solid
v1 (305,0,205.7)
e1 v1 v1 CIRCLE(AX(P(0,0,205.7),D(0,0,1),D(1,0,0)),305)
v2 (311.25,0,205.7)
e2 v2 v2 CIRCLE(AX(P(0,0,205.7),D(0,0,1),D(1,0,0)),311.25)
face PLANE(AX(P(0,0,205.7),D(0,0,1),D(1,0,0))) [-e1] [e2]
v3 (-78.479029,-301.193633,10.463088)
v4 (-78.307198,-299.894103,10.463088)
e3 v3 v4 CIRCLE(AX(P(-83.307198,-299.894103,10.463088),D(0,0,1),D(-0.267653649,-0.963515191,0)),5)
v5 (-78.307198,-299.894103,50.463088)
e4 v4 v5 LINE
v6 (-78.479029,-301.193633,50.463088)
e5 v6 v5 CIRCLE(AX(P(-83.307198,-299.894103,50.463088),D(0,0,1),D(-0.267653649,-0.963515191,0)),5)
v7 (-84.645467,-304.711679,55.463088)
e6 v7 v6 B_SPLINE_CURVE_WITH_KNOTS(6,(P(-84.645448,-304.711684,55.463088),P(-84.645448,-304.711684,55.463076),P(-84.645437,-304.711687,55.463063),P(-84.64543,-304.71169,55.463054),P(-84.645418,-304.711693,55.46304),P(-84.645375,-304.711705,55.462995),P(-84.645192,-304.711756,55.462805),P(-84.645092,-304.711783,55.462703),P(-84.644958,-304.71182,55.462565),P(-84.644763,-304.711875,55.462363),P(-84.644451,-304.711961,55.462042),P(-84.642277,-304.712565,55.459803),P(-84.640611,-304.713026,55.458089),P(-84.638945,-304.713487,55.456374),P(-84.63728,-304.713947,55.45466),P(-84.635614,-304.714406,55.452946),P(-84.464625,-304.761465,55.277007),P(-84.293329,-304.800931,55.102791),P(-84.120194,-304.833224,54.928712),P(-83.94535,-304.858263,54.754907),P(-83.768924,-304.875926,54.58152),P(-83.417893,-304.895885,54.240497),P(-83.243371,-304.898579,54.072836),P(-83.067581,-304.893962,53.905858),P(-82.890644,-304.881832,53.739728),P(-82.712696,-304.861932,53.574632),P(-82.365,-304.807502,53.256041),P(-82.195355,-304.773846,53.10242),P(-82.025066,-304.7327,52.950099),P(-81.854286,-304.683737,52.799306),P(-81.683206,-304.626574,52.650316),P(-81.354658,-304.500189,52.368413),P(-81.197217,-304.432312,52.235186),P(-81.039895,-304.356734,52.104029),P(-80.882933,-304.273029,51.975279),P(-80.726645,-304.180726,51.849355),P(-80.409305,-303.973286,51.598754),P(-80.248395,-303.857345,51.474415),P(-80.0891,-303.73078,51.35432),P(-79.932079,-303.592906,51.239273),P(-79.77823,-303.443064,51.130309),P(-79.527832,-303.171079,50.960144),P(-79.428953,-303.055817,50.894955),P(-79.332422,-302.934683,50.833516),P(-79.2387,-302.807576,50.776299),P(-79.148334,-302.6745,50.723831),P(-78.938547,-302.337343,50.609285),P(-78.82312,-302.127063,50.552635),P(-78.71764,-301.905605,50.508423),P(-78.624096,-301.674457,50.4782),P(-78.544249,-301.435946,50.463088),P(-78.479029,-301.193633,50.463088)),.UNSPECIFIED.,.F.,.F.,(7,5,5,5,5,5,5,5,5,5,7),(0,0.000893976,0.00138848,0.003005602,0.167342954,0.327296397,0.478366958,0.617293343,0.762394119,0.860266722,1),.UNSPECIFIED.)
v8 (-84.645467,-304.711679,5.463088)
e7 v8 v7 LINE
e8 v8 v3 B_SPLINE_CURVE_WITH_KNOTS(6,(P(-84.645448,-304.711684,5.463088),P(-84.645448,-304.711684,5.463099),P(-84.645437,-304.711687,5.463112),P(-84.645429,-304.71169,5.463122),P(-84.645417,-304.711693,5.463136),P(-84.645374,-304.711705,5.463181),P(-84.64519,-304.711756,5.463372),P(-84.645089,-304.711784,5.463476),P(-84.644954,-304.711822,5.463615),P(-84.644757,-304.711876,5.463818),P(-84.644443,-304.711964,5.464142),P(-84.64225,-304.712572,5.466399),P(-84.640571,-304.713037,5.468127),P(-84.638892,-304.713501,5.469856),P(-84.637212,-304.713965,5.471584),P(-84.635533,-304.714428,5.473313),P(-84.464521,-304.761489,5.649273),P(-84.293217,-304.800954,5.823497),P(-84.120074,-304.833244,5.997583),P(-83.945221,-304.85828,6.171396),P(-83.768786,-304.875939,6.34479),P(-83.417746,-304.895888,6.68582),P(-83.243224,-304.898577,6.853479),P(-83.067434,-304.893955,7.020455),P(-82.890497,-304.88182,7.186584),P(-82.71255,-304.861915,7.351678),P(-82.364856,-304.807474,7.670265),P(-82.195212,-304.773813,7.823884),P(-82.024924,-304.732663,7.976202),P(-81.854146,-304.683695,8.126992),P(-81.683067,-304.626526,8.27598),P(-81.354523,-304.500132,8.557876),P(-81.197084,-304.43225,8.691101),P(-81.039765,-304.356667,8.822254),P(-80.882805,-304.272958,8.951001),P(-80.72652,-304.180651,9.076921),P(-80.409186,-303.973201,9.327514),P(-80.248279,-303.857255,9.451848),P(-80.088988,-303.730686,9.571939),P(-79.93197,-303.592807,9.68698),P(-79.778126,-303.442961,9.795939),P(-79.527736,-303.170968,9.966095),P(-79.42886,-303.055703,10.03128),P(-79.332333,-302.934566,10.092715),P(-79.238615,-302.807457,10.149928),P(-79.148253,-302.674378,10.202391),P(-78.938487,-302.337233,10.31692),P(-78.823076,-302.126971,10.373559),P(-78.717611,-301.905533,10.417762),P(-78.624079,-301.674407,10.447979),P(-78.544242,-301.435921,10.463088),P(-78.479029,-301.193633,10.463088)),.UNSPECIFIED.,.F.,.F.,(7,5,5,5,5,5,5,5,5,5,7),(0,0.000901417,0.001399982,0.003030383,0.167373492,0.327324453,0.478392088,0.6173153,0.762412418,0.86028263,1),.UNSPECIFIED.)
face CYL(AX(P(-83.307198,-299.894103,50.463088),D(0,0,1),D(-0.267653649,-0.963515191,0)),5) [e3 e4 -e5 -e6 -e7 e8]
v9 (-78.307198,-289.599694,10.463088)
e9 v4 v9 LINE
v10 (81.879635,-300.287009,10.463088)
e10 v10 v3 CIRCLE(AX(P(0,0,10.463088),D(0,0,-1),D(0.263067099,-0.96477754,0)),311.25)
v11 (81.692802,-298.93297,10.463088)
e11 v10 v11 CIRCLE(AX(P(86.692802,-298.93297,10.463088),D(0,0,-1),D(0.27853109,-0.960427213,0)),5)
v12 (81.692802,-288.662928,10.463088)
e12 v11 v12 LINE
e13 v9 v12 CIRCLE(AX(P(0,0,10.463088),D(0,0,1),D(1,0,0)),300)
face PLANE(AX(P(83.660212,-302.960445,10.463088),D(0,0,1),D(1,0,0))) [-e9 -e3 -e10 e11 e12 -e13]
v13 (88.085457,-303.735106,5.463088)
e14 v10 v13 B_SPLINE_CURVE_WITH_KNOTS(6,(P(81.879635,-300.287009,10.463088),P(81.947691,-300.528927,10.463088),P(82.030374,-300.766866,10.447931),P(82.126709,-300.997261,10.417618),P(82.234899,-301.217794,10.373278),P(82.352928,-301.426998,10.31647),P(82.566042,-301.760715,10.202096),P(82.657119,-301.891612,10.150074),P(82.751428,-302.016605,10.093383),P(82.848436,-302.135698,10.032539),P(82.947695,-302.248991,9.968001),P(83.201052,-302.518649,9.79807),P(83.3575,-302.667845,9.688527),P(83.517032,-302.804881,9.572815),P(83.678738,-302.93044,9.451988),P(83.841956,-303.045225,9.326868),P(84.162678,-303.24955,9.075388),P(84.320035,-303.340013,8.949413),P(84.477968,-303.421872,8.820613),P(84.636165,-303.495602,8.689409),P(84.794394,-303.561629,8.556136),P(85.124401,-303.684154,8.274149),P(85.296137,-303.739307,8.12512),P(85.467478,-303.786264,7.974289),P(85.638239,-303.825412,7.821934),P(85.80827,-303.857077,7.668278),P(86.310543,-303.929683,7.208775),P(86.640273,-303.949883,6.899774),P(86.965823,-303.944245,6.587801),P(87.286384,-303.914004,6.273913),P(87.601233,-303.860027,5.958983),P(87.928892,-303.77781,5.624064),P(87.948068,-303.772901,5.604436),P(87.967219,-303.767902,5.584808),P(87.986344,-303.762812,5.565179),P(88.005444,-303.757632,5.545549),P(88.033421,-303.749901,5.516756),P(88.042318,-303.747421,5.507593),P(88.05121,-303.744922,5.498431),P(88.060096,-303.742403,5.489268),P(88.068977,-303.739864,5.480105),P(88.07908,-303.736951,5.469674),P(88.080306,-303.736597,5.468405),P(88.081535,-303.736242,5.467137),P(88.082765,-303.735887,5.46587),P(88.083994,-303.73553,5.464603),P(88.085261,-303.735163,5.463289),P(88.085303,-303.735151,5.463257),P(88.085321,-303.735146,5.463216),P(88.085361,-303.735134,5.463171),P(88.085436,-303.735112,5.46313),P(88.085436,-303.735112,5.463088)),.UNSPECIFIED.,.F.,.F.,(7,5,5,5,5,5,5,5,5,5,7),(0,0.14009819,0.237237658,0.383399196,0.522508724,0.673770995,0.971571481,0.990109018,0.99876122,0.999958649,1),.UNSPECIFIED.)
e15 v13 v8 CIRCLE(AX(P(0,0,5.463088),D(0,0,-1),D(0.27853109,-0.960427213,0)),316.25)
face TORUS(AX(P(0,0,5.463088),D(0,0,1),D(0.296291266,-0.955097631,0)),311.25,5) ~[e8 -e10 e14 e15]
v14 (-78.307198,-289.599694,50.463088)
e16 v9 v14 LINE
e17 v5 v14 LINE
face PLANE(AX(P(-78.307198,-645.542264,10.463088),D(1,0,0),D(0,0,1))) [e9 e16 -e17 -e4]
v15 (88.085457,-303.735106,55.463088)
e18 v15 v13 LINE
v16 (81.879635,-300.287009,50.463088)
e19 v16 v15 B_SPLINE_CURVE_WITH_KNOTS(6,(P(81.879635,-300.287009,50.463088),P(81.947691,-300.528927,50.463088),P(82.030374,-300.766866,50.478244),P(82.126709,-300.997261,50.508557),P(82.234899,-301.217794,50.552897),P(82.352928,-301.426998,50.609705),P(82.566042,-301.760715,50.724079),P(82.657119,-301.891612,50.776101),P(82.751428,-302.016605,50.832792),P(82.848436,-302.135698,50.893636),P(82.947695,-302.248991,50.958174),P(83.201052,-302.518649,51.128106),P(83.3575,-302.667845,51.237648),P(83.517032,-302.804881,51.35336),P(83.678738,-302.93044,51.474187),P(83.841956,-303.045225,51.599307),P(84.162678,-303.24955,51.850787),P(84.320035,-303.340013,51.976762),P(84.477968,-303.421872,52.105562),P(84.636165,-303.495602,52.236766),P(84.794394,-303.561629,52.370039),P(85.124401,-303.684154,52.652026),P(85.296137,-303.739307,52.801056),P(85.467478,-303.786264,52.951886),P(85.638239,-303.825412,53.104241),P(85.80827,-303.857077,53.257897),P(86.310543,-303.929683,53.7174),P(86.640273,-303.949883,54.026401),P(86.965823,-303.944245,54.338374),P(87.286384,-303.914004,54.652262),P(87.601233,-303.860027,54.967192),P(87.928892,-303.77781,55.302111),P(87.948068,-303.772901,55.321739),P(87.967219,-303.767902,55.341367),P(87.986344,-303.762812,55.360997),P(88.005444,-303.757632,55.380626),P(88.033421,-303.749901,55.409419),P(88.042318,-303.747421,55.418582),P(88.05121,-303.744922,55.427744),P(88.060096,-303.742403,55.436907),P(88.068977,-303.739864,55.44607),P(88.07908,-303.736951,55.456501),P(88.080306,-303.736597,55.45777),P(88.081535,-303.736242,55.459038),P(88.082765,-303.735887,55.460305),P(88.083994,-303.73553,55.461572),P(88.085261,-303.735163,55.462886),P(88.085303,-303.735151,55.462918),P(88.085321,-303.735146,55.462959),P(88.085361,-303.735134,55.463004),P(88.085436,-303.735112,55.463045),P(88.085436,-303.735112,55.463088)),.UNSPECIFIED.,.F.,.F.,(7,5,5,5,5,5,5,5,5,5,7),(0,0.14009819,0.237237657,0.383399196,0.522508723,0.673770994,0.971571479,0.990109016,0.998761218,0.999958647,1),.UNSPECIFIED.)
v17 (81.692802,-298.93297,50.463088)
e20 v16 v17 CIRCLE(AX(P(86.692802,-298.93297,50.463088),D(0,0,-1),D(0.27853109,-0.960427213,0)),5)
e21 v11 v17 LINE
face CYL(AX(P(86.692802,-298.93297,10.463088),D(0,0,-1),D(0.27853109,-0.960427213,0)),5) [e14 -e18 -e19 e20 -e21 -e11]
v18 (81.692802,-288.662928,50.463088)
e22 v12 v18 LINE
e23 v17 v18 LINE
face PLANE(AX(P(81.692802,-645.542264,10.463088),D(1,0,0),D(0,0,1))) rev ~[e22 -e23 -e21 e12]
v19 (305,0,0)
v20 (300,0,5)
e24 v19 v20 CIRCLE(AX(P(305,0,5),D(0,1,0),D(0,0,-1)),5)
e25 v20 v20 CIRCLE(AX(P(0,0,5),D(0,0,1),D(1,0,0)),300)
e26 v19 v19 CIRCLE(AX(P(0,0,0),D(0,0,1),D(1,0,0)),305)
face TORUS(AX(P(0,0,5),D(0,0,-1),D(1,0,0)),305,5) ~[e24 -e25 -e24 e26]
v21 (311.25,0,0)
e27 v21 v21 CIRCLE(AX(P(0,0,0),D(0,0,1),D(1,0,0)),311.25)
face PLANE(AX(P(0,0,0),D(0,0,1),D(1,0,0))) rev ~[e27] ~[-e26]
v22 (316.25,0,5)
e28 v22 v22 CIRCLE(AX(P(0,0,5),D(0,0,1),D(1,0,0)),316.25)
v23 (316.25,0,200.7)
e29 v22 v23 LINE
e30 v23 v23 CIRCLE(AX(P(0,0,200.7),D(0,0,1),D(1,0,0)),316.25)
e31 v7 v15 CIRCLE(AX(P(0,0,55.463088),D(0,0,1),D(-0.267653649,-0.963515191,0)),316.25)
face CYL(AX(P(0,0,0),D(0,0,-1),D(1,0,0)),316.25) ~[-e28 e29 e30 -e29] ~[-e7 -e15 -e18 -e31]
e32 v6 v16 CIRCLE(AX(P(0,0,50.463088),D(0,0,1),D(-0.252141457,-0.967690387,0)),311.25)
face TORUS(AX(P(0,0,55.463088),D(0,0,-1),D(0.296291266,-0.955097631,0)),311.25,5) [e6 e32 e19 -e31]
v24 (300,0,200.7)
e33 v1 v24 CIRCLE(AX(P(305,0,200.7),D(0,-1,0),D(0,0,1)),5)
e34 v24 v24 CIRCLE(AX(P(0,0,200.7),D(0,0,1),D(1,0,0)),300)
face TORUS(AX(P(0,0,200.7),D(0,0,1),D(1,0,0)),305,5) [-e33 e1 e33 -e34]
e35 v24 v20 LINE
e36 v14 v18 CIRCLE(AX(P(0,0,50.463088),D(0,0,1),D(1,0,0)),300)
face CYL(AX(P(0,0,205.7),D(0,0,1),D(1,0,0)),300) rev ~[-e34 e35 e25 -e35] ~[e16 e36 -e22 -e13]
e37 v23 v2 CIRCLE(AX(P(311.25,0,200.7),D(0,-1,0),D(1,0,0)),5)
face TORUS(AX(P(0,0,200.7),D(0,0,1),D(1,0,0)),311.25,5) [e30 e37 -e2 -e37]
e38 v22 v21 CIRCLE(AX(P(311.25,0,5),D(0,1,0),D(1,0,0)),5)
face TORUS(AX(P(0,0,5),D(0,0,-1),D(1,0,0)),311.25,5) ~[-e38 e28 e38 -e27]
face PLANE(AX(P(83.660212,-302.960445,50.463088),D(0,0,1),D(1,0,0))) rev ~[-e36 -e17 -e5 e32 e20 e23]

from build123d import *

# Parameters (mm, degrees)
F0_R         = 316.25
F1_DEPTH     = 205.7
F2_R         = 300
F3_DEPTH     = 631
F5_W         = 160
F5_H         = 40
F6_DEPTH     = 796.1248755455
F7_T1_DEPTH  = 40
F7_T10_ANGLE = 33.8359646931
F7_T16_ANGLE = 33.8359646931
F7_T27_ANGLE = 33.8359646931
F7_T31_DEPTH = 56.5905669687
F7_T38_DEPTH = 56.399324286
F7_T42_ANGLE = 33.8359646931
F7_T49_ANGLE = 33.8359646931
F7_T53_DEPTH = 56.5905669687
F7_T60_ANGLE = 33.8359646931
F7_T64_DEPTH = 56.399324286


# Not quite as in the source:
# - a fillet or chamfer that OpenCascade refuses, or shapes differently, is made with other operations: its cross-section is extruded or revolved along the edge and cut away or added


with BuildPart() as f1:
    # F0 (on Top) → F1 (new body)
    with BuildSketch(Plane.XY):
        Circle(F0_R)
    extrude(amount=F1_DEPTH)

    # F2 (on face) → F3 (cut)
    with BuildSketch(Plane.XY.offset(205.7)):
        Circle(F2_R)
    extrude(amount=-F3_DEPTH, mode=Mode.SUBTRACT)

    # F5 (on offset) → F6 (cut)
    with BuildSketch(Plane.XZ.offset(645.5422639847)):
        with Locations((1.6928017139, 30.4630875368)):
            Rectangle(F5_W, F5_H)
    extrude(amount=-F6_DEPTH, mode=Mode.SUBTRACT)

    # F7: fillet of radius 5 on 8 edges, made by hand

    # F7_s2 → F7_t1 (cut)
    with BuildSketch(Plane.XY.offset(10.4630875368)):
        with BuildLine():
            ThreePointArc((88.0854571632, -303.7351061968), (83.6897430437, -302.9306742994), (81.6928017139, -298.9329701304))
            Line((81.6928017139, -298.9329701304), (81.6928017139, -305.5165276186))
            ThreePointArc((81.6928017139, -305.5165276186), (84.8938022614, -304.6425853974), (88.0854571632, -303.7351061968))
        make_face()
        with BuildLine():
            ThreePointArc((-84.6454665316, -304.7116792899), (-80.2815860528, -303.8747654151), (-78.3071982861, -299.8941033327))
            Line((-78.3071982861, -299.8941033327), (-78.3071982861, -306.401770877))
            ThreePointArc((-78.3071982861, -306.401770877), (-81.4807145599, -305.5731592513), (-84.6454665316, -304.7116792899))
        make_face()
    extrude(amount=F7_T1_DEPTH, mode=Mode.SUBTRACT)

    # F7_s3 → F7_t4 (revolve, cut)
    with BuildSketch(Plane.XZ):
        with BuildLine():
            ThreePointArc((316.25, 200.7), (314.7855339059, 204.2355339059), (311.25, 205.7))
            Line((311.25, 205.7), (316.25, 205.7))
            Line((316.25, 205.7), (316.25, 200.7))
        make_face()
    revolve(axis=Axis((0, 0, 205.7), (0, 0, 1)), mode=Mode.SUBTRACT)

    # F7_s5 → F7_t6 (revolve, cut)
    with BuildSketch(Plane.XZ):
        with BuildLine():
            ThreePointArc((305, 205.7), (301.4644660941, 204.2355339059), (300, 200.7))
            Line((300, 200.7), (300, 205.7))
            Line((300, 205.7), (305, 205.7))
        make_face()
    revolve(axis=Axis((0, 0, 205.7), (0, 0, 1)), mode=Mode.SUBTRACT)


with BuildPart() as f7_tool8:
    # F7_s9 → F7_t10 (revolve)
    with BuildSketch(Plane(origin=(0, 0, 0), x_dir=(0, 0, 1), z_dir=(0.9550976314, 0.2962912662, 0))):
        with BuildLine():
            ThreePointArc((55.4630875368, 316.25), (51.9275536309, 314.7855339059), (50.4630875368, 311.25))
            Line((50.4630875368, 311.25), (50.4630875368, 316.25))
            Line((50.4630875368, 316.25), (55.4630875368, 316.25))
        make_face()
    revolve(axis=Axis((0, 0, 50.4630875368), (0, 0, -1)), revolution_arc=F7_T10_ANGLE)

    split(bisect_by=Plane.YZ.offset(-78.3071982861), keep=Keep.TOP)

    split(bisect_by=Plane.YZ.offset(81.6928017139), keep=Keep.BOTTOM)


with BuildPart() as f1_1:
    add(f1.part)

    # F7_t7: cut F7_tool8
    add(f7_tool8.part, mode=Mode.SUBTRACT)


with BuildPart() as f7_tool14:
    # F7_s15 → F7_t16 (revolve)
    with BuildSketch(Plane(origin=(0, 0, 0), x_dir=(0, 0, 1), z_dir=(0.9550976314, 0.2962912662, 0))):
        with BuildLine():
            ThreePointArc((5.4630875368, 316.25), (8.9986214427, 314.7855339059), (10.4630875368, 311.25))
            Line((10.4630875368, 311.25), (10.4630875368, 316.25))
            Line((10.4630875368, 316.25), (5.4630875368, 316.25))
        make_face()
    revolve(axis=Axis((0, 0, 10.4630875368), (0, 0, -1)), revolution_arc=F7_T16_ANGLE)

    split(bisect_by=Plane.YZ.offset(81.6928017139), keep=Keep.BOTTOM)

    split(bisect_by=Plane.YZ.offset(-78.3071982861), keep=Keep.TOP)


with BuildPart() as f1_2:
    add(f1_1.part)

    # F7_t13: cut F7_tool14
    add(f7_tool14.part, mode=Mode.SUBTRACT)

    # F7_s19 → F7_t20 (revolve, cut)
    with BuildSketch(Plane.XZ):
        with BuildLine():
            ThreePointArc((316.25, 5), (314.7855339059, 1.4644660941), (311.25, 0))
            Line((311.25, 0), (316.25, 0))
            Line((316.25, 0), (316.25, 5))
        make_face()
    revolve(axis=Axis((0, 0, 0), (0, 0, 1)), mode=Mode.SUBTRACT)

    # F7_s21 → F7_t22 (revolve, cut)
    with BuildSketch(Plane.XZ):
        with BuildLine():
            ThreePointArc((305, 0), (301.4644660941, 1.4644660941), (300, 5))
            Line((300, 5), (300, 0))
            Line((300, 0), (305, 0))
        make_face()
    revolve(axis=Axis((0, 0, 0), (0, 0, 1)), mode=Mode.SUBTRACT)


with BuildPart() as f7_tool25:
    # F7_s26 → F7_t27 (revolve)
    with BuildSketch(Plane(origin=(0, 0, 0), x_dir=(0, 0, 1), z_dir=(0.9550976314, 0.2962912662, 0))):
        with BuildLine():
            ThreePointArc((55.4630875368, 316.25), (51.9275536309, 314.7855339059), (50.4630875368, 311.25))
            Line((50.4630875368, 311.25), (50.4630875368, 316.25))
            Line((50.4630875368, 316.25), (55.4630875368, 316.25))
        make_face()
    revolve(axis=Axis((0, 0, 50.4630875368), (0, 0, -1)), revolution_arc=F7_T27_ANGLE)

    split(bisect_by=Plane.YZ.offset(81.6928017139), keep=Keep.TOP)


with BuildPart() as f7_tool29:
    # F7_s30 → F7_t31 (new body)
    with BuildSketch(Plane.XY.offset(67.0536545055)):
        with BuildLine():
            ThreePointArc((88.0854571632, -303.7351061968), (83.6897430437, -302.9306742994), (81.6928017139, -298.9329701304))
            Line((81.6928017139, -298.9329701304), (81.6928017139, -305.5165276186))
            ThreePointArc((81.6928017139, -305.5165276186), (84.8938022614, -304.6425853974), (88.0854571632, -303.7351061968))
        make_face()
    extrude(amount=-F7_T31_DEPTH)

    split(bisect_by=Plane.XY.offset(50.4630875368), keep=Keep.TOP)


with BuildPart() as f7_tool25_1:
    add(f7_tool25.part)

    # F7_t33: intersect F7_tool29
    add(f7_tool29.part, mode=Mode.INTERSECT)


with BuildPart() as f1_3:
    add(f1_2.part)

    # F7_t23: cut F7_tool25
    add(f7_tool25_1.part, mode=Mode.SUBTRACT)


with BuildPart() as f7_tool36:
    # F7_s37 → F7_t38 (new body)
    with BuildSketch(Plane.XY.offset(66.8624118228)):
        with BuildLine():
            ThreePointArc((-84.6454665316, -304.7116792899), (-80.2815860528, -303.8747654151), (-78.3071982861, -299.8941033327))
            Line((-78.3071982861, -299.8941033327), (-78.3071982861, -306.401770877))
            ThreePointArc((-78.3071982861, -306.401770877), (-81.4807145599, -305.5731592513), (-84.6454665316, -304.7116792899))
        make_face()
    extrude(amount=-F7_T38_DEPTH)

    split(bisect_by=Plane.XY.offset(50.4630875368), keep=Keep.TOP)


with BuildPart() as f7_tool40:
    # F7_s41 → F7_t42 (revolve)
    with BuildSketch(Plane(origin=(0, 0, 0), x_dir=(0, 0, 1), z_dir=(0.9550976314, 0.2962912662, 0))):
        with BuildLine():
            ThreePointArc((55.4630875368, 316.25), (51.9275536309, 314.7855339059), (50.4630875368, 311.25))
            Line((50.4630875368, 311.25), (50.4630875368, 316.25))
            Line((50.4630875368, 316.25), (55.4630875368, 316.25))
        make_face()
    revolve(axis=Axis((0, 0, 50.4630875368), (0, 0, -1)), revolution_arc=F7_T42_ANGLE)

    split(bisect_by=Plane.YZ.offset(-78.3071982861), keep=Keep.BOTTOM)


with BuildPart() as f7_tool36_1:
    add(f7_tool36.part)

    # F7_t44: intersect F7_tool40
    add(f7_tool40.part, mode=Mode.INTERSECT)


with BuildPart() as f1_4:
    add(f1_3.part)

    # F7_t34: cut F7_tool36
    add(f7_tool36_1.part, mode=Mode.SUBTRACT)


with BuildPart() as f7_tool47:
    # F7_s48 → F7_t49 (revolve)
    with BuildSketch(Plane(origin=(0, 0, 0), x_dir=(0, 0, 1), z_dir=(0.9550976314, 0.2962912662, 0))):
        with BuildLine():
            ThreePointArc((5.4630875368, 316.25), (8.9986214427, 314.7855339059), (10.4630875368, 311.25))
            Line((10.4630875368, 311.25), (10.4630875368, 316.25))
            Line((10.4630875368, 316.25), (5.4630875368, 316.25))
        make_face()
    revolve(axis=Axis((0, 0, 10.4630875368), (0, 0, -1)), revolution_arc=F7_T49_ANGLE)

    split(bisect_by=Plane.YZ.offset(81.6928017139), keep=Keep.TOP)


with BuildPart() as f7_tool51:
    # F7_s52 → F7_t53 (new body)
    with BuildSketch(Plane.XY.offset(50.4630875368)):
        with BuildLine():
            ThreePointArc((88.0854571632, -303.7351061968), (83.6897430437, -302.9306742994), (81.6928017139, -298.9329701304))
            Line((81.6928017139, -298.9329701304), (81.6928017139, -305.5165276186))
            ThreePointArc((81.6928017139, -305.5165276186), (84.8938022614, -304.6425853974), (88.0854571632, -303.7351061968))
        make_face()
    extrude(amount=-F7_T53_DEPTH)

    split(bisect_by=Plane.XY.offset(10.4630875368), keep=Keep.BOTTOM)


with BuildPart() as f7_tool47_1:
    add(f7_tool47.part)

    # F7_t55: intersect F7_tool51
    add(f7_tool51.part, mode=Mode.INTERSECT)


with BuildPart() as f1_5:
    add(f1_4.part)

    # F7_t45: cut F7_tool47
    add(f7_tool47_1.part, mode=Mode.SUBTRACT)


with BuildPart() as f7_tool58:
    # F7_s59 → F7_t60 (revolve)
    with BuildSketch(Plane(origin=(0, 0, 0), x_dir=(0, 0, 1), z_dir=(0.9550976314, 0.2962912662, 0))):
        with BuildLine():
            ThreePointArc((5.4630875368, 316.25), (8.9986214427, 314.7855339059), (10.4630875368, 311.25))
            Line((10.4630875368, 311.25), (10.4630875368, 316.25))
            Line((10.4630875368, 316.25), (5.4630875368, 316.25))
        make_face()
    revolve(axis=Axis((0, 0, 10.4630875368), (0, 0, -1)), revolution_arc=F7_T60_ANGLE)

    split(bisect_by=Plane.YZ.offset(-78.3071982861), keep=Keep.BOTTOM)


with BuildPart() as f7_tool62:
    # F7_s63 → F7_t64 (new body)
    with BuildSketch(Plane.XY.offset(50.4630875368)):
        with BuildLine():
            ThreePointArc((-84.6454665316, -304.7116792899), (-80.2815860528, -303.8747654151), (-78.3071982861, -299.8941033327))
            Line((-78.3071982861, -299.8941033327), (-78.3071982861, -306.401770877))
            ThreePointArc((-78.3071982861, -306.401770877), (-81.4807145599, -305.5731592513), (-84.6454665316, -304.7116792899))
        make_face()
    extrude(amount=-F7_T64_DEPTH)

    split(bisect_by=Plane.XY.offset(10.4630875368), keep=Keep.BOTTOM)


with BuildPart() as f7_tool58_1:
    add(f7_tool58.part)

    # F7_t66: intersect F7_tool62
    add(f7_tool62.part, mode=Mode.INTERSECT)


with BuildPart() as f1_6:
    add(f1_5.part)

    # F7_t56: cut F7_tool58
    add(f7_tool58_1.part, mode=Mode.SUBTRACT)


solid = f1_6.part
